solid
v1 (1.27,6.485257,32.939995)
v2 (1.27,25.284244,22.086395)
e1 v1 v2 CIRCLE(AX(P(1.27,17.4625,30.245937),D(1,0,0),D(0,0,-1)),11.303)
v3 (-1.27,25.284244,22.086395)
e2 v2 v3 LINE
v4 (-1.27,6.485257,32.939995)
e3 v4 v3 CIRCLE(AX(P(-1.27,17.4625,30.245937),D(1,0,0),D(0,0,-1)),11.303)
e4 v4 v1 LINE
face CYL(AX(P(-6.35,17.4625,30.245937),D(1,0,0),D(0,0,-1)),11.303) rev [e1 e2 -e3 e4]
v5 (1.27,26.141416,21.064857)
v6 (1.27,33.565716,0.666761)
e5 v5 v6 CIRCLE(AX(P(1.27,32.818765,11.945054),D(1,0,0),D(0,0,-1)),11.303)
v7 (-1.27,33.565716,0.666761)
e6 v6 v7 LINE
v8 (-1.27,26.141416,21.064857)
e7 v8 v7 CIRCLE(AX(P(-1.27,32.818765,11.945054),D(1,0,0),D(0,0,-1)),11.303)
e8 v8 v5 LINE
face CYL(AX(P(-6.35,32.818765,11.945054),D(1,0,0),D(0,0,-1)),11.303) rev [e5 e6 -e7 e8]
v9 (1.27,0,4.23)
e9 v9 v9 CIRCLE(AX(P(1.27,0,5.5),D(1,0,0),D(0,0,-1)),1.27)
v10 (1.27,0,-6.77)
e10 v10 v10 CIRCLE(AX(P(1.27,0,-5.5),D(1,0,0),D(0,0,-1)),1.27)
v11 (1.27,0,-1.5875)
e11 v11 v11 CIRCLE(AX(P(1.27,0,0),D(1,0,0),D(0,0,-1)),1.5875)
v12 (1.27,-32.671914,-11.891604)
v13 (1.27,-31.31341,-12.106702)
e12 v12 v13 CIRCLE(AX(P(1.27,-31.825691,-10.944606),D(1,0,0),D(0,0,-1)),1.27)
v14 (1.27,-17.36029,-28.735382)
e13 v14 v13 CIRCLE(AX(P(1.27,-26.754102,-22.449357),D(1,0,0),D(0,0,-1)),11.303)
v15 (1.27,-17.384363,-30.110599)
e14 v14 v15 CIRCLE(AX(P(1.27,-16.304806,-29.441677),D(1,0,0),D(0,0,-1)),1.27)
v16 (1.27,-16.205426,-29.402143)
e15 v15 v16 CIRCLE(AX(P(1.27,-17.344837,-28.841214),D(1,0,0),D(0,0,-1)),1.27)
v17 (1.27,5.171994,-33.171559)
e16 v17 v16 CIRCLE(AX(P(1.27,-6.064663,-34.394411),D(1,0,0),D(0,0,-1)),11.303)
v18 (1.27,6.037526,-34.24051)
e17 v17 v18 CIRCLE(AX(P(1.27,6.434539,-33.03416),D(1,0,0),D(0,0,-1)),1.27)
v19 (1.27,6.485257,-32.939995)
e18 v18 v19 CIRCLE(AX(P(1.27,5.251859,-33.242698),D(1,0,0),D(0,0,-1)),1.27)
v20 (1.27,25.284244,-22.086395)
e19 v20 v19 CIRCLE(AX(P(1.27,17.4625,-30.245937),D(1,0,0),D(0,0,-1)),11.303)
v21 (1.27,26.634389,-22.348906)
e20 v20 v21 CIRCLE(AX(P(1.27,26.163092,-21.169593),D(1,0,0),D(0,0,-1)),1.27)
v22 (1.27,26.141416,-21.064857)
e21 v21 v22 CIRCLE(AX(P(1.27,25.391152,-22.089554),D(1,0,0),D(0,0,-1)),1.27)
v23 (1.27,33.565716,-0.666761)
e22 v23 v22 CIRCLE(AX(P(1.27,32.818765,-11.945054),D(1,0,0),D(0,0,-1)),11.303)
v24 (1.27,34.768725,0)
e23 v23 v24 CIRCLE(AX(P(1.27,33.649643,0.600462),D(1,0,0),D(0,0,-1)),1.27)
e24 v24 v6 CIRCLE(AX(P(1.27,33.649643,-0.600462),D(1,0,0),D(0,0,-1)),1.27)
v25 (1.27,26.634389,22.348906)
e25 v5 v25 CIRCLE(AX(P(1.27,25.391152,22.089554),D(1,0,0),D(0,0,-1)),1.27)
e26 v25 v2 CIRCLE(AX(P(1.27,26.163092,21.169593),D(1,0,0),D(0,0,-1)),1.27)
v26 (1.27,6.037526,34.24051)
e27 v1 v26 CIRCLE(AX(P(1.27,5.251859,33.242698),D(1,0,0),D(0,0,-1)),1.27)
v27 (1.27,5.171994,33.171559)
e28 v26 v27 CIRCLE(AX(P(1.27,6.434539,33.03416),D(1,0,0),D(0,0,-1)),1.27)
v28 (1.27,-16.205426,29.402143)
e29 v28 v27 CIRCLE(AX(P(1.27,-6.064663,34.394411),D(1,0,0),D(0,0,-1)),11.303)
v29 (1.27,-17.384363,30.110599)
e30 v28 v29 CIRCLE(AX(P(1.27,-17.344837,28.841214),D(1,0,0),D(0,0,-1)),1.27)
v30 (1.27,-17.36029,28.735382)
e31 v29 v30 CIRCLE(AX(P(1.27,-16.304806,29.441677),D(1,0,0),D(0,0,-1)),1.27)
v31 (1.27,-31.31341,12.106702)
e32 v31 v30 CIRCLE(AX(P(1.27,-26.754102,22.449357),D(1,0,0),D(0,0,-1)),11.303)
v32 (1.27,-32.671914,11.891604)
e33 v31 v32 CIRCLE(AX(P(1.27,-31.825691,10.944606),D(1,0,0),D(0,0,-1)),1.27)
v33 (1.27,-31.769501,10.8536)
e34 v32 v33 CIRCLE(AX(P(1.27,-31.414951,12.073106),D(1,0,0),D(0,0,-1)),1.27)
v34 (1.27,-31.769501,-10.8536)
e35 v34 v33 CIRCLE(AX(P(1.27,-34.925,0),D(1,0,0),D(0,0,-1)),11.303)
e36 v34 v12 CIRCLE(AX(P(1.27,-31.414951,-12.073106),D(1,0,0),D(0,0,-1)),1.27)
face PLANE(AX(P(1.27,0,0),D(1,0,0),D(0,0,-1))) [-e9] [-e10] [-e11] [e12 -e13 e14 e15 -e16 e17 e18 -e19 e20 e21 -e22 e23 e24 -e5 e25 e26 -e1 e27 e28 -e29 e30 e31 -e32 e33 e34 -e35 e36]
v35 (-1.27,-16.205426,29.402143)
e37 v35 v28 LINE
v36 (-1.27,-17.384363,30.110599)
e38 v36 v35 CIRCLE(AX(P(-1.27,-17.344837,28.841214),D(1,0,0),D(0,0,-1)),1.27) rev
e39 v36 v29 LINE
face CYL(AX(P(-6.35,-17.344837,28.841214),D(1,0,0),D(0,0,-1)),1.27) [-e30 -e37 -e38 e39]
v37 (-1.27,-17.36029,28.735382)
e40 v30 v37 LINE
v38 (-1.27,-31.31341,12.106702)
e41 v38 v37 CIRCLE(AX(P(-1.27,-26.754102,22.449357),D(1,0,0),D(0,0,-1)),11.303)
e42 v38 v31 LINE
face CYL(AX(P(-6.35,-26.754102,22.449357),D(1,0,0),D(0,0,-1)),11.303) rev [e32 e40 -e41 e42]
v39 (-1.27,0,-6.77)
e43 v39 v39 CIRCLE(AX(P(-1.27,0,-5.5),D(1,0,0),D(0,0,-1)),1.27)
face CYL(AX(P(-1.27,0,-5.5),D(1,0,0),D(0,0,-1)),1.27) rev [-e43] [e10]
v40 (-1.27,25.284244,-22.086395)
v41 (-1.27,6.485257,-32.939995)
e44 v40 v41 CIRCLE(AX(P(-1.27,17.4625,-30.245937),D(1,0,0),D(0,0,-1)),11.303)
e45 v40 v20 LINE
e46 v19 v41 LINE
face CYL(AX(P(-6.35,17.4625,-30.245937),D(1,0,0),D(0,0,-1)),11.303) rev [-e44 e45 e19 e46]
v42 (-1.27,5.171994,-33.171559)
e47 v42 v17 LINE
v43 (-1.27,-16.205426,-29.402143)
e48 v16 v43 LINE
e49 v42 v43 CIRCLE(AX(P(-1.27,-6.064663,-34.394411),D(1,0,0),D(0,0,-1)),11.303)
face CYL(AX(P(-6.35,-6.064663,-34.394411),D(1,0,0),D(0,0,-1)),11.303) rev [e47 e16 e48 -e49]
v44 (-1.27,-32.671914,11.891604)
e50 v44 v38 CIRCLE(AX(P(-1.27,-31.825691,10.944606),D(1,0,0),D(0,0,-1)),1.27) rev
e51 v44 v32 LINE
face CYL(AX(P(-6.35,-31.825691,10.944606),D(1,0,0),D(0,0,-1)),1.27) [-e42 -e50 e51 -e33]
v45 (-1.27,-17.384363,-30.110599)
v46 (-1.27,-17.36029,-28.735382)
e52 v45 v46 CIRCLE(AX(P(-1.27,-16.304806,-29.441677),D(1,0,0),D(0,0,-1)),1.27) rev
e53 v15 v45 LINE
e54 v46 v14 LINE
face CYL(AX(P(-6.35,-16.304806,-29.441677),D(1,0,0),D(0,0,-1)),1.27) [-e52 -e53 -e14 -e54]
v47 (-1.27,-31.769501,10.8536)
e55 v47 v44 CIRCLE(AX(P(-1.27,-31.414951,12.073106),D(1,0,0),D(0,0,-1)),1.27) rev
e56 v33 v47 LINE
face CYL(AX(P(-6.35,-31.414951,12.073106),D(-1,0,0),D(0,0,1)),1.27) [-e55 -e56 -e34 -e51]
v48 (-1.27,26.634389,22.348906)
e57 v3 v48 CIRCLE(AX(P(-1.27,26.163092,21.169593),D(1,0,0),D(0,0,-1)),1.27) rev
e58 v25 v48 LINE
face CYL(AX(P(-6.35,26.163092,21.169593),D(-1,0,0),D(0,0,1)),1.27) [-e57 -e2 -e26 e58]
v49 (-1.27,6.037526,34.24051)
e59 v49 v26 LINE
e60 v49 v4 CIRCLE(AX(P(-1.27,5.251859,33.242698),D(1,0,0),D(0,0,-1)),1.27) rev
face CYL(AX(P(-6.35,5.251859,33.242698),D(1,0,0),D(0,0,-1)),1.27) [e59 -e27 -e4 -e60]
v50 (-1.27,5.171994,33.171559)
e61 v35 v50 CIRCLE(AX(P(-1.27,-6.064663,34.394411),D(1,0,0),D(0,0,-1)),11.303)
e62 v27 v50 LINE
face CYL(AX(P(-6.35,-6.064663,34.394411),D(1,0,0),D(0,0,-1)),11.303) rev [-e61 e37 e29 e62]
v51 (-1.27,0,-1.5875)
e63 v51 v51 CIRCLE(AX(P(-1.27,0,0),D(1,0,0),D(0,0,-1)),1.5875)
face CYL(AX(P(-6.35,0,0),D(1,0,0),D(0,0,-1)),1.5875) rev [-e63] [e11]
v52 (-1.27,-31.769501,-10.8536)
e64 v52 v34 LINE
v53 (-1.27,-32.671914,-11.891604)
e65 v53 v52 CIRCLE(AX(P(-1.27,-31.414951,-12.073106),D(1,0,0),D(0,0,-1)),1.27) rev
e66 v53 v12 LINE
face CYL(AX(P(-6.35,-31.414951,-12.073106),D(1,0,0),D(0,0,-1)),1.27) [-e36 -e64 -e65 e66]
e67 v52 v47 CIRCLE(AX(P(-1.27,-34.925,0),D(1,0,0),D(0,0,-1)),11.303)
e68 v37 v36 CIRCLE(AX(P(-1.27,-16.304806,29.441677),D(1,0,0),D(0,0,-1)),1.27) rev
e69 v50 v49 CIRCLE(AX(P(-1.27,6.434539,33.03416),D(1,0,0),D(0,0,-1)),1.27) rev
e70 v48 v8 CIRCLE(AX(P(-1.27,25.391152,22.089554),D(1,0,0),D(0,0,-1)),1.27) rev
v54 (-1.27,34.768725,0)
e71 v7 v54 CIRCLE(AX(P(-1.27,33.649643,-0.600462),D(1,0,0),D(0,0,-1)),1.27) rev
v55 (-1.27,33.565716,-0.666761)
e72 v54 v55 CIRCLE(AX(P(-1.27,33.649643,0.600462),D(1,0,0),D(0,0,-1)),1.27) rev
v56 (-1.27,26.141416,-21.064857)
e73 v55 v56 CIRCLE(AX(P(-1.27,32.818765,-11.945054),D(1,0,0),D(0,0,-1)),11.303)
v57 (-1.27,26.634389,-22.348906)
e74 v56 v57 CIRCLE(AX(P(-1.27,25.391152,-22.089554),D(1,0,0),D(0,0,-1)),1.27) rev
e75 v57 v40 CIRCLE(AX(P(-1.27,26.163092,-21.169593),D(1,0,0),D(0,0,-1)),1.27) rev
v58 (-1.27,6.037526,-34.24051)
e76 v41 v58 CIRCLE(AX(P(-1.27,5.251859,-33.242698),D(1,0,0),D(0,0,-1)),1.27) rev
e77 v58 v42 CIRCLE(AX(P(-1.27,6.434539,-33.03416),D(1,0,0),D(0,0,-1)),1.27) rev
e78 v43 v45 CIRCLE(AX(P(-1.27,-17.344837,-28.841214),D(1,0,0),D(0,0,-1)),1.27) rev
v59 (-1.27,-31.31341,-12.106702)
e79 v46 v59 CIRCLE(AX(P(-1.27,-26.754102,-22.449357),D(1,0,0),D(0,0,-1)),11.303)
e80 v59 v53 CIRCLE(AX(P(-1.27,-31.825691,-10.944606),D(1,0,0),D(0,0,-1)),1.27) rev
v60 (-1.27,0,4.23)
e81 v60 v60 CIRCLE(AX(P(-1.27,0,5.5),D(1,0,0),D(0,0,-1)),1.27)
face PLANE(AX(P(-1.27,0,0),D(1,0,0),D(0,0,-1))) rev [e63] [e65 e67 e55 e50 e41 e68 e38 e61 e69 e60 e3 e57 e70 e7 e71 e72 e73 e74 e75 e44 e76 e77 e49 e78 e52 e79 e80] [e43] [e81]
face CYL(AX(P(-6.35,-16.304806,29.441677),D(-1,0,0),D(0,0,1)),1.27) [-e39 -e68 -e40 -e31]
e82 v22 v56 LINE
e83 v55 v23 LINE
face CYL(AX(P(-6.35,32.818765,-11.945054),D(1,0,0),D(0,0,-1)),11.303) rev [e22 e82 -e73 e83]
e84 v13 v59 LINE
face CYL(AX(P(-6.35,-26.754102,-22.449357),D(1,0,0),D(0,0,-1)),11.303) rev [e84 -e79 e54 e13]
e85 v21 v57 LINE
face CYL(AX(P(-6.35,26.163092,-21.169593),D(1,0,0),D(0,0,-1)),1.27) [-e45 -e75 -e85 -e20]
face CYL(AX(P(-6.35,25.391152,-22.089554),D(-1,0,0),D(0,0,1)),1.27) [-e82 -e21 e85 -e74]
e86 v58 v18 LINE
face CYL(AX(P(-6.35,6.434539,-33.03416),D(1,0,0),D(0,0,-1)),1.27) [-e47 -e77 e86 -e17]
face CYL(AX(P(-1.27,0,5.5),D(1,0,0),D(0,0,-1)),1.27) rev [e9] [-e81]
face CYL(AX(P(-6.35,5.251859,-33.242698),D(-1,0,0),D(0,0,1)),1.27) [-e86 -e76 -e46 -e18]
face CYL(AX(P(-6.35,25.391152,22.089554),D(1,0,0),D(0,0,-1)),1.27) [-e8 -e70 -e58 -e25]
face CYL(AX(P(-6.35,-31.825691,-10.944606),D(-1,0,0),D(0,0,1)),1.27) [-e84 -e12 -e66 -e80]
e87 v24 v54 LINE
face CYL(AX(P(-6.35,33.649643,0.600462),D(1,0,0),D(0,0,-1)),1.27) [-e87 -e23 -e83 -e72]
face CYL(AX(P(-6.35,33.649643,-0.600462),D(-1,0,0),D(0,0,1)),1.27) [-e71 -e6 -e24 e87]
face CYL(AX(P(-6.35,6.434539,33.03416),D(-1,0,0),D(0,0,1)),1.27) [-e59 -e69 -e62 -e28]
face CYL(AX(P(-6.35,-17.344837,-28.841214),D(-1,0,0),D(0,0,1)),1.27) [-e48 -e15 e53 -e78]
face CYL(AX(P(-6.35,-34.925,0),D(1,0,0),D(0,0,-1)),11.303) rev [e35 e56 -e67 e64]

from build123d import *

# Parameters (mm, degrees)
SKETCH1_R           = 34.925
BOSS_EXTRUDE1_DEPTH = 1.27
SKETCH3_R           = 11.303
CUT_EXTRUDE1_DEPTH  = 6.35
CIRPATTERN1_COUNT   = 9
FILLET1_R           = 1.27
SKETCH5_R           = 1.5875
CUT_EXTRUDE2_DEPTH  = 6.35
SKETCH6_R           = 1.27
CUT_EXTRUDE3_DEPTH  = 49.864387552


with BuildPart() as part:
    # Sketch1 → Boss-Extrude1 (new, symmetric)
    with BuildSketch(Plane(origin=(0, 0, 0), x_dir=(0, 0, -1), z_dir=(1, 0, 0))):
        Circle(SKETCH1_R)
    extrude(amount=BOSS_EXTRUDE1_DEPTH, both=True)

    # Sketch3 → Cut-Extrude1 (cut, symmetric)
    with BuildSketch(Plane(origin=(0, 0, 0), x_dir=(0, 0, -1), z_dir=(1, 0, 0))):
        with Locations((0, -34.925)):
            Circle(SKETCH3_R)
    cut_extrude1 = extrude(amount=CUT_EXTRUDE1_DEPTH, both=True, mode=Mode.SUBTRACT)

    # CirPattern1: Cut-Extrude1 ×9 about axis
    cirpattern1_axis = Axis((0, 0, 0), (1, 0, 0))
    for i in range(1, CIRPATTERN1_COUNT):
        add(cut_extrude1.rotate(cirpattern1_axis, i * 360 / CIRPATTERN1_COUNT), mode=Mode.SUBTRACT)

    # Fillet1
    # the kernel refuses this fillet: 1.27 mm, written as the material it takes off along each edge
    with BuildSketch(Plane(origin=(-4.923134512, -16.731633019, -30.656289429), x_dir=(0, 0.38689872135285164, 0.9221222150103143), z_dir=(1, 0, 0)), Plane(origin=(-4.923134512, 27.285133925, -21.800850711), x_dir=(0, -0.8409288486623601, 0.541145702641532), z_dir=(1, 0, 0)), Plane(origin=(-4.923134512, 34.91494194, 0.838125473), x_dir=(0, -0.9920306242693342, -0.12599698612187168), z_dir=(1, 0, 0)), Plane(origin=(-4.923134512, 26.207660586, 23.084933434), x_dir=(0, -0.6789502455883892, -0.7341842847783286), z_dir=(1, 0, 0)), Plane(origin=(-4.923134512, 5.237523577, 34.53004448), x_dir=(0, -0.048181501305167504, -0.9988385970375695), z_dir=(1, 0, 0)), Plane(origin=(-4.923134512, -18.183308922, 29.818163955), x_dir=(0, 0.6051319029164822, -0.7961252288884437), z_dir=(1, 0, 0)), Plane(origin=(-4.923134512, -33.095969091, 11.154033124), x_dir=(0, 0.9752973644715361, -0.22089601819606364), z_dir=(1, 0, 0)), Plane(origin=(-4.923134512, -32.522657502, -12.729193769), x_dir=(0, 0.8891103499675269, 0.45769289439603716), z_dir=(1, 0, 0))) as fillet1_piece_1:
        with BuildLine():
            CenterArc((1.436473101, 1.267699411), FILLET1_R, 171.739357487, 94.811422393)
            ThreePointArc((0.179649711, 1.450168495), (0.082239687, 0.726023913), (0, 0))
            ThreePointArc((0, 0), (0.680032479, 0.020475246), (1.360064958, 0))
        make_face()
    extrude(amount=9.846269024, mode=Mode.SUBTRACT)
    with BuildSketch(Plane(origin=(-4.923134512, 5.237523577, -34.53004448), x_dir=(0, 0.9853377060596639, 0.1706153715732537), z_dir=(1, 0, 0)), Plane(origin=(-4.923134512, 34.91494194, -0.838125473), x_dir=(0, 0.0030787563353731583, 0.999995260618483), z_dir=(1, 0, 0)), Plane(origin=(-4.923134512, 27.285133925, 21.800850711), x_dir=(0, -0.6404260990883884, 0.7680197989677282), z_dir=(1, 0, 0)), Plane(origin=(-4.923134512, 6.888308505, 34.238966558), x_dir=(0, -0.984268465205427, 0.17667933779067993), z_dir=(1, 0, 0)), Plane(origin=(-4.923134512, -16.731633019, 30.656289429), x_dir=(0, -0.8675606775273359, -0.497331349110741), z_dir=(1, 0, 0)), Plane(origin=(-4.923134512, -32.522657502, 12.729193769), x_dir=(0, -0.34491160697127204, -0.9386351705409801), z_dir=(1, 0, 0)), Plane(origin=(-4.923134512, -18.183308922, -29.818163955), x_dir=(0, 0.8644819211919598, -0.5026639115077373), z_dir=(1, 0, 0))) as fillet1_piece_2:
        with BuildLine():
            CenterArc((1.434685554, 1.269722067), FILLET1_R, 176.387286037, 94.811422393)
            ThreePointArc((0.167209335, 1.349747283), (0.103924585, 0.67235637), (0, 0))
            ThreePointArc((0, 0), (0.730626902, -0.007643151), (1.461253805, 0))
        make_face()
    extrude(amount=9.846269024, mode=Mode.SUBTRACT)
    with BuildSketch(Plane(origin=(-4.923134512, 6.888308505, -34.238966558), x_dir=(0, -0.984268465205427, -0.1766793377906796), z_dir=(1, 0, 0))) as fillet1_piece_3:
        with BuildLine():
            CenterArc((1.434685554, -1.269722067), FILLET1_R, 88.80129157, 94.811422393)
            ThreePointArc((0.167209335, -1.349747283), (0.103924585, -0.67235637), (0, 0))
            ThreePointArc((0, 0), (0.730626902, 0.007643151), (1.461253805, 0))
        make_face()
    extrude(amount=9.846269024, mode=Mode.SUBTRACT)
    with BuildSketch(Plane(origin=(-4.923134512, 26.207660586, -23.084933434), x_dir=(0, -0.6789502455883865, 0.7341842847783312), z_dir=(1, 0, 0)), Plane(origin=(-4.923134512, -33.095969091, -11.154033124), x_dir=(0, 0.9752973644715363, 0.22089601819606305), z_dir=(1, 0, 0))) as fillet1_piece_4:
        with BuildLine():
            CenterArc((1.436473101, -1.267699411), FILLET1_R, 93.44922012, 94.811422393)
            ThreePointArc((0.179649711, -1.450168495), (0.082239687, -0.726023913), (0, 0))
            ThreePointArc((0, 0), (0.680032479, -0.020475246), (1.360064958, 0))
        make_face()
    extrude(amount=9.846269024, mode=Mode.SUBTRACT)

    # Sketch5 → Cut-Extrude2 (cut, symmetric)
    with BuildSketch(Plane(origin=(0, 0, 0), x_dir=(0, 0, -1), z_dir=(1, 0, 0))):
        Circle(SKETCH5_R)
    extrude(amount=CUT_EXTRUDE2_DEPTH, both=True, mode=Mode.SUBTRACT)

    # Sketch6 → Cut-Extrude3 (cut, through all)
    with BuildSketch(Plane(origin=(1.27, 0, 0), x_dir=(0, 0, -1), z_dir=(1, 0, 0))):
        with Locations((-5.5, 0)):
            Circle(SKETCH6_R)
        with Locations((5.5, 0)):
            Circle(SKETCH6_R)
    extrude(amount=-CUT_EXTRUDE3_DEPTH, mode=Mode.SUBTRACT)


solid = part.part
